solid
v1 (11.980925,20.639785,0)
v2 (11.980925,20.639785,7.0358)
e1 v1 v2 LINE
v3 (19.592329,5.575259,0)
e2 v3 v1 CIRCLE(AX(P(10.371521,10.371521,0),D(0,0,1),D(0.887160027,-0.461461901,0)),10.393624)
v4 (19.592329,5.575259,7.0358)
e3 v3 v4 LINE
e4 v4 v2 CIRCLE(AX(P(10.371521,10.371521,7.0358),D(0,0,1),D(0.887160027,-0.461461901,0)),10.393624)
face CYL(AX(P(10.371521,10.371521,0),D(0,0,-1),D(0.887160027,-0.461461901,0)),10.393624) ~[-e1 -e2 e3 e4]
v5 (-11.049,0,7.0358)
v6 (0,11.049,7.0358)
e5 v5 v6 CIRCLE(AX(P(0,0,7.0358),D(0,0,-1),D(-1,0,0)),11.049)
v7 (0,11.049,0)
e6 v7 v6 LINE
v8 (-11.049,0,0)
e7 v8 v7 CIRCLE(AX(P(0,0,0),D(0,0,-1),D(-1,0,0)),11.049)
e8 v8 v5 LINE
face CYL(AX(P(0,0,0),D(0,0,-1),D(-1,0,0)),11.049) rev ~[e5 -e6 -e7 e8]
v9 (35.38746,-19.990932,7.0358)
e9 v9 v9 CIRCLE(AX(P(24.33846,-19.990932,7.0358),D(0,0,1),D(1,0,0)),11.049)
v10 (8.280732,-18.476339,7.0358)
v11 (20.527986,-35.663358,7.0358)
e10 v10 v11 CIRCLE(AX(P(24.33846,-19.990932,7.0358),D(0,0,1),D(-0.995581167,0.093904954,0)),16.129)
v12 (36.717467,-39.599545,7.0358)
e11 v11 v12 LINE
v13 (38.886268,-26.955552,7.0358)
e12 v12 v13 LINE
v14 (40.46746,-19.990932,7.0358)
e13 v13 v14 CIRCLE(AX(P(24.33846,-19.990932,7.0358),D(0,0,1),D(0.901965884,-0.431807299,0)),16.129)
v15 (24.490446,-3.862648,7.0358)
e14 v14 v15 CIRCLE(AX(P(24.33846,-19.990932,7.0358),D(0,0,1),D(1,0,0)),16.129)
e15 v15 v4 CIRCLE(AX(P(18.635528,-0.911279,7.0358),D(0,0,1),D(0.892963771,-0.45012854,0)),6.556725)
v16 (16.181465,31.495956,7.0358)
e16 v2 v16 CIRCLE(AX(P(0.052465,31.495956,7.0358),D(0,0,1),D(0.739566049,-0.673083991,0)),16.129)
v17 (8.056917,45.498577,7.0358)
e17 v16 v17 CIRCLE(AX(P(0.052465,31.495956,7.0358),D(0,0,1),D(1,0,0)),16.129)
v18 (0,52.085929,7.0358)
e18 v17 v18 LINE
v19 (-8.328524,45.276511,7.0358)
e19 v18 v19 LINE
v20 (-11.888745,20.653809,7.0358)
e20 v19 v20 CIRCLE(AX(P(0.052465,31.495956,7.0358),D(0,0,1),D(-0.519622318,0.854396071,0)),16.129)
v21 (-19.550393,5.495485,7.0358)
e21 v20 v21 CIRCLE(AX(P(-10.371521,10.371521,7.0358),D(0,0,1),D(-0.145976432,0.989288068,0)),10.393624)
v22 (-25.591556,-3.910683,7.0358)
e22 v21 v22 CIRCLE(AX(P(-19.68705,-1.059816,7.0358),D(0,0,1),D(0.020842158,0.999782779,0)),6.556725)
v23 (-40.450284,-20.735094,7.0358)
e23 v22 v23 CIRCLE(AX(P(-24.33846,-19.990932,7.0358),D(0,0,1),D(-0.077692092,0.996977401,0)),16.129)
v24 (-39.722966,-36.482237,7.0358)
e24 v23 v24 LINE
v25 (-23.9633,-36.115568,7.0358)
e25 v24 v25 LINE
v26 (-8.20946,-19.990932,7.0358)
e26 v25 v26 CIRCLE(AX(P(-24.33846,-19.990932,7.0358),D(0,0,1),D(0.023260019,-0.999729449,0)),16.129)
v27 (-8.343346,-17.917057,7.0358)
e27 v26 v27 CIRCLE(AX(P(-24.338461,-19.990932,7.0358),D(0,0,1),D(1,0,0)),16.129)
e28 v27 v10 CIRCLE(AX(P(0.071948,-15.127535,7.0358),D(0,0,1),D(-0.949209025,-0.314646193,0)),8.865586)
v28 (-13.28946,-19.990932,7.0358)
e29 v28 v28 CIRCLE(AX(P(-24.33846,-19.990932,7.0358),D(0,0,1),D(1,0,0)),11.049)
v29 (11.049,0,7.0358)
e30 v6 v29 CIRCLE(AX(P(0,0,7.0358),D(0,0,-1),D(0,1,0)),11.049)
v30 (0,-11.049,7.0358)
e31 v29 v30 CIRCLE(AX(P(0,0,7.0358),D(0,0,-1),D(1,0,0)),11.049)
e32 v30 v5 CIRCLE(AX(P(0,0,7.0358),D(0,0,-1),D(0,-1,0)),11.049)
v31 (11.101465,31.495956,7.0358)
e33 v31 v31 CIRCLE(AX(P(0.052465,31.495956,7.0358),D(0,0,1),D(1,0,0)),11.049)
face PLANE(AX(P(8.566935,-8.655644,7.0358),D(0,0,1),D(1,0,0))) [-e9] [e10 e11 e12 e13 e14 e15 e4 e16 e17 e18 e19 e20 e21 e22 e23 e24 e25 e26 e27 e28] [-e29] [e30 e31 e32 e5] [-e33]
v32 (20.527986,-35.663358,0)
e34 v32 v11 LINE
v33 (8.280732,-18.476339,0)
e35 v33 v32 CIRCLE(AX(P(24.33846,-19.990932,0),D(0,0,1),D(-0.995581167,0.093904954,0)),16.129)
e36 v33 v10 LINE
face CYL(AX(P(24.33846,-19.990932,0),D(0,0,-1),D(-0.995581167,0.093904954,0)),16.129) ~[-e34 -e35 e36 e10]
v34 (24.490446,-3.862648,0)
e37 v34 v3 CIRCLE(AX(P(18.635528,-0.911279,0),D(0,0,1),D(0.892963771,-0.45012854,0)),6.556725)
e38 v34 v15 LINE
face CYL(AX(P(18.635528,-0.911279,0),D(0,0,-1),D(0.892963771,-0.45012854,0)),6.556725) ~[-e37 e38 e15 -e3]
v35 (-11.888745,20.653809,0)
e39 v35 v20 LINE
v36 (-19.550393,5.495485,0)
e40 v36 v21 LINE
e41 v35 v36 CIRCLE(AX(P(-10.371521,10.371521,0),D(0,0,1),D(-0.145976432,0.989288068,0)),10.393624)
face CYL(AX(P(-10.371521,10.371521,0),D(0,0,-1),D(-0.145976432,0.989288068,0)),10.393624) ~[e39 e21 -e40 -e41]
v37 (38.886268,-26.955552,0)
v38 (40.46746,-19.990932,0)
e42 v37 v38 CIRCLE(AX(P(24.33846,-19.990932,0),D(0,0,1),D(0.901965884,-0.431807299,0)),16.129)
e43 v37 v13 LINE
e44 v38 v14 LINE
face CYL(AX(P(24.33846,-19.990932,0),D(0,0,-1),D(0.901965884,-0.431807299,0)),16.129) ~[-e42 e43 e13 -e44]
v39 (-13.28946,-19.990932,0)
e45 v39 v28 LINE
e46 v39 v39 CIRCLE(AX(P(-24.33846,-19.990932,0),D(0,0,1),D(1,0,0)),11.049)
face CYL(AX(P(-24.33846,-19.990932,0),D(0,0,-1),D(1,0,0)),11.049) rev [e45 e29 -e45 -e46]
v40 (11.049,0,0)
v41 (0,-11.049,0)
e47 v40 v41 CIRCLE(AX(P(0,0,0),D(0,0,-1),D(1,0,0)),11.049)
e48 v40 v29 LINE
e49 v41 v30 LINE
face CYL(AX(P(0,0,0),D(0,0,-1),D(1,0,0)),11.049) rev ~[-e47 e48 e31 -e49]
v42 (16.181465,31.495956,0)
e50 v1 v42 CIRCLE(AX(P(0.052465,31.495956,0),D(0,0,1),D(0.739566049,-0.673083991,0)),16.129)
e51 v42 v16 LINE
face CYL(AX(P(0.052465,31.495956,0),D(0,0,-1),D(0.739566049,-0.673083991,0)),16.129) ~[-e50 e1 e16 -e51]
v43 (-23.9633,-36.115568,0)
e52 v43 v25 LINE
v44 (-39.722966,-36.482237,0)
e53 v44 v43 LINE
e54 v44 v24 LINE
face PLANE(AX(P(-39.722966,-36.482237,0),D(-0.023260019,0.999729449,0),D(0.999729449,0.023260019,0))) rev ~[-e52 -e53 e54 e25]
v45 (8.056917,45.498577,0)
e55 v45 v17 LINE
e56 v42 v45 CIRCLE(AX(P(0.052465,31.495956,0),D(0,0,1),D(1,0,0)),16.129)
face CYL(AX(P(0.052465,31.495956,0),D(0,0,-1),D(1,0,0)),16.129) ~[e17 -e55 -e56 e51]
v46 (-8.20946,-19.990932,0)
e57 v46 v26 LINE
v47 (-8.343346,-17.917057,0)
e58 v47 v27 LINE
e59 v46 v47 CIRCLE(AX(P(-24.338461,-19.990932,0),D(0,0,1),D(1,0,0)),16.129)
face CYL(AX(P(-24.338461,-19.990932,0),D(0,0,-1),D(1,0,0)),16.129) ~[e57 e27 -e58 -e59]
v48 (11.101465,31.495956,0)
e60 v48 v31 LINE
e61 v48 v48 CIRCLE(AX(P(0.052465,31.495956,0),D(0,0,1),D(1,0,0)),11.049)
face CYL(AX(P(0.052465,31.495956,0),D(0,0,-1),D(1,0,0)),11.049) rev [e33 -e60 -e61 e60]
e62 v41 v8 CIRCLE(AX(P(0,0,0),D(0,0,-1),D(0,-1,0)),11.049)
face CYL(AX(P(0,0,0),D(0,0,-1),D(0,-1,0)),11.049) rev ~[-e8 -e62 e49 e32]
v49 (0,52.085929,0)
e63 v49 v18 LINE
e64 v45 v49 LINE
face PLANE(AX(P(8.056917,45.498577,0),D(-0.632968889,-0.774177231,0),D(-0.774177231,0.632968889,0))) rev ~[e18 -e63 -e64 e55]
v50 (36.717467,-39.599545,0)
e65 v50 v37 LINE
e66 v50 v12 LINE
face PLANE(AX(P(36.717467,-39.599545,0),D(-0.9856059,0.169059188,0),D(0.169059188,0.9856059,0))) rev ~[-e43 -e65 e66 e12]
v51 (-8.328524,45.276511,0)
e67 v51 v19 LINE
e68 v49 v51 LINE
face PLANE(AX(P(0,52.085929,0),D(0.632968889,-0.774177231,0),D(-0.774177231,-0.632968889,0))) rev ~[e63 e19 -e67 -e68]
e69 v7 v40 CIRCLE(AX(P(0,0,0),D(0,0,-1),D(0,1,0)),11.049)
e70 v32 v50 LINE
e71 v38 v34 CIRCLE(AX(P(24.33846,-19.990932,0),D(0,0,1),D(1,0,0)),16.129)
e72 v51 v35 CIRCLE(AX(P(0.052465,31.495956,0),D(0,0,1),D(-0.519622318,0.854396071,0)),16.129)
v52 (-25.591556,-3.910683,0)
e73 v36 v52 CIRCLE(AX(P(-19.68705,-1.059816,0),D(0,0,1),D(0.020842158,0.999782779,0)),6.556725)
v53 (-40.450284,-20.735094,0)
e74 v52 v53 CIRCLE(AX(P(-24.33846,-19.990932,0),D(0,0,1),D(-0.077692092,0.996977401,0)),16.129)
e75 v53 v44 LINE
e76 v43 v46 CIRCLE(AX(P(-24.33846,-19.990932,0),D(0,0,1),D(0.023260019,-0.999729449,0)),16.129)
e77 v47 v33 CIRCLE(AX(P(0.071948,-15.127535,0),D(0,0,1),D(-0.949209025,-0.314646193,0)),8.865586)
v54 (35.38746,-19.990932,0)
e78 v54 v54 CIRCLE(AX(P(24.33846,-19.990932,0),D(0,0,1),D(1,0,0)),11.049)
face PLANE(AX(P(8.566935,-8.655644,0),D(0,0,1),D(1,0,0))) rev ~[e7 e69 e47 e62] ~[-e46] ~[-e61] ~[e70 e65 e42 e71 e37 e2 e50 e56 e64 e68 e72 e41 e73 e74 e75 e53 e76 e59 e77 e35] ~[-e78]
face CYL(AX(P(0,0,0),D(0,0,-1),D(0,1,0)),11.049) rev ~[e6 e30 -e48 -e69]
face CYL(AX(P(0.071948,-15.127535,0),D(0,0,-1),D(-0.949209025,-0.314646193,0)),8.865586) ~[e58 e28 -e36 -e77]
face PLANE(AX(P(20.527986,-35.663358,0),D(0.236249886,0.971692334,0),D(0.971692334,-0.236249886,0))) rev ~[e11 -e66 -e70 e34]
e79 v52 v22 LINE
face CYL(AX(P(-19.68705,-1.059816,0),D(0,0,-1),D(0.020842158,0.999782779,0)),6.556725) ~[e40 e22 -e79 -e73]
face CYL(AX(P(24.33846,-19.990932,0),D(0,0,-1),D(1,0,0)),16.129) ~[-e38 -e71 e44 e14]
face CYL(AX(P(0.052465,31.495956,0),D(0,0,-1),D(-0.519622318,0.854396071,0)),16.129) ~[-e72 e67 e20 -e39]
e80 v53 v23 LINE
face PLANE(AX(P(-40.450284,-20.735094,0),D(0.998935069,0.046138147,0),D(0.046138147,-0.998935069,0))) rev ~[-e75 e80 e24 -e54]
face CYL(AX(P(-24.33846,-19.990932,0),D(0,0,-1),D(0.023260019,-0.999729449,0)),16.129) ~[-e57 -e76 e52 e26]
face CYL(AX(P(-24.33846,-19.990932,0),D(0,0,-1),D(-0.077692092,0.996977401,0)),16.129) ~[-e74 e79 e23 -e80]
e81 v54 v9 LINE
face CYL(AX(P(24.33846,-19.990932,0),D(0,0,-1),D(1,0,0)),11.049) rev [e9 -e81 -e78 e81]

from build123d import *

# Parameters (mm, degrees)
F0_R     = 11.049
F1_DEPTH = 7.0358


with BuildPart() as f1:
    # F0 (on Top) → F1 (new body)
    with BuildSketch(Plane.XY):
        with BuildLine():
            ThreePointArc((15.3606223584, -6.5915638429), (14.0515764921, -2.7419023957), (11.049, 0))
            ThreePointArc((11.049, 0), (7.8128228253, -7.8128228253), (0, -11.049))
            ThreePointArc((0, -11.049), (3.7722273632, -14.6239373815), (8.9372329685, -15.2006467181))
            ThreePointArc((8.9372329685, -15.2006467181), (11.4112106852, -10.3456815617), (15.3606223584, -6.5915638429))
        make_face()
        with BuildLine():
            ThreePointArc((0, 11.049), (7.8128228253, 7.8128228253), (11.049, 0))
            ThreePointArc((11.049, 0), (16.0517409884, 1.6673539034), (19.5923287649, 5.5752593056))
            ThreePointArc((19.5923287649, 5.5752593056), (19.648285181, 15.0586380241), (11.9809254143, 20.639784613))
            ThreePointArc((11.9809254143, 20.639784613), (7.1318081537, 17.0036295078), (1.2830021666, 15.4139658073))
            ThreePointArc((1.2830021666, 15.4139658073), (0.3997348377, 13.3025456864), (0, 11.049))
        make_face()
        with BuildLine():
            ThreePointArc((19.5923287649, 5.5752593056), (16.0517409884, 1.6673539034), (11.049, 0))
            ThreePointArc((11.049, 0), (14.0515764921, -2.7419023957), (15.3606223584, -6.5915638429))
            ThreePointArc((15.3606223584, -6.5915638429), (19.7194060635, -4.5374863882), (24.4904460645, -3.8626479736))
            ThreePointArc((24.4904460645, -3.8626479736), (24.4551845175, 2.1090263166), (19.5923287649, 5.5752593056))
        make_face()
        with BuildLine():
            ThreePointArc((-1.2878785477, 15.4227450117), (-0.401152017, 13.3073628417), (0, 11.049))
            ThreePointArc((0, 11.049), (0.3997348377, 13.3025456864), (1.2830021666, 15.4139658073))
            ThreePointArc((1.2830021666, 15.4139658073), (-0.0026133903, 15.367050345), (-1.2878785477, 15.4227450117))
        make_face()
        with BuildLine():
            ThreePointArc((-11.049, 0), (-7.8128228253, 7.8128228253), (0, 11.049))
            ThreePointArc((0, 11.049), (-0.401152017, 13.3073628417), (-1.2878785477, 15.4227450117))
            ThreePointArc((-1.2878785477, 15.4227450117), (-7.0848261597, 17.032079869), (-11.8887450472, 20.6538092378))
            ThreePointArc((-11.8887450472, 20.6538092378), (-19.6475824124, 15.060028688), (-19.5503933089, 5.4954851872))
            ThreePointArc((-19.5503933089, 5.4954851872), (-16.0139499505, 1.6428086369), (-11.049, 0))
        make_face()
        with BuildLine():
            ThreePointArc((-8.7698737274, -15.7762258045), (-3.5991350923, -14.870419784), (0, -11.049))
            ThreePointArc((0, -11.049), (-7.8128228253, -7.8128228253), (-11.049, 0))
            ThreePointArc((-11.049, 0), (-14.2101099006, -2.5648530064), (-15.7760277941, -6.3223771779))
            ThreePointArc((-15.7760277941, -6.3223771779), (-11.380052467, -10.3875833636), (-8.7698737274, -15.7762258045))
        make_face()
        with BuildLine():
            ThreePointArc((8.9372329685, -15.2006467181), (3.7722273632, -14.6239373815), (0, -11.049))
            ThreePointArc((0, -11.049), (-3.5991350923, -14.870419784), (-8.7698737274, -15.7762258045))
            ThreePointArc((-8.7698737274, -15.7762258045), (-8.5203506621, -16.839417556), (-8.3433460468, -17.9170574897))
            ThreePointArc((-8.3433460468, -17.9170574897), (-0.2261466235, -23.9881077254), (8.2807318523, -18.4763388586))
            ThreePointArc((8.2807318523, -18.4763388586), (8.523941199, -16.8214491689), (8.9372329685, -15.2006467181))
        make_face()
        with BuildLine():
            ThreePointArc((8.9372329685, -15.2006467181), (13.7625460617, -12.1000545802), (15.3606223584, -6.5915638429))
            ThreePointArc((15.3606223584, -6.5915638429), (11.4112106852, -10.3456815617), (8.9372329685, -15.2006467181))
        make_face()
        with BuildLine():
            ThreePointArc((24.4904460645, -3.8626479736), (20.5132557556, -7.1933790888), (15.3606223584, -6.5915638429))
            ThreePointArc((15.3606223584, -6.5915638429), (13.7625460617, -12.1000545802), (8.9372329685, -15.2006467181))
            ThreePointArc((8.9372329685, -15.2006467181), (8.7646746362, -16.8696960014), (8.2807318523, -18.4763388586))
            ThreePointArc((8.2807318523, -18.4763388586), (11.2032111335, -29.3509460419), (20.5279860839, -35.6633575195))
            ThreePointArc((20.5279860839, -35.6633575195), (31.2506997753, -34.5637006191), (38.8862682367, -26.9555517986))
            ThreePointArc((38.8862682367, -26.9555517986), (40.0671958518, -23.5618596089), (40.4674604904, -19.9909318682))
            ThreePointArc((40.4674604904, -19.9909318682), (35.7969947842, -8.6398687974), (24.4904460645, -3.8626479736))
        make_face()
        with Locations((24.3384604904, -19.9909318682)):
            Circle(F0_R, mode=Mode.SUBTRACT)
        with BuildLine():
            ThreePointArc((24.4904460645, -3.8626479736), (19.7194060635, -4.5374863882), (15.3606223584, -6.5915638429))
            ThreePointArc((15.3606223584, -6.5915638429), (20.5132557556, -7.1933790888), (24.4904460645, -3.8626479736))
        make_face()
        with BuildLine():
            ThreePointArc((-15.7760277941, -6.3223771779), (-14.2101099006, -2.5648530064), (-11.049, 0))
            ThreePointArc((-11.049, 0), (-16.0139499505, 1.6428086369), (-19.5503933089, 5.4954851872))
            ThreePointArc((-19.5503933089, 5.4954851872), (-25.2039351491, 2.4834340402), (-25.5915562379, -3.9106833611))
            ThreePointArc((-25.5915562379, -3.9106833611), (-20.4899973654, -4.3277912963), (-15.7760277941, -6.3223771779))
        make_face()
        with BuildLine():
            ThreePointArc((2.1504403371, 16.730865023), (1.6917102547, 16.0888900954), (1.2830021666, 15.4139658073))
            ThreePointArc((1.2830021666, 15.4139658073), (7.1318081537, 17.0036295078), (11.9809254143, 20.639784613))
            ThreePointArc((11.9809254143, 20.639784613), (6.5311461577, 20.0296234429), (2.1504403371, 16.730865023))
        make_face()
        with BuildLine():
            ThreePointArc((-1.2878785477, 15.4227450117), (-0.0026133903, 15.367050345), (1.2830021666, 15.4139658073))
            ThreePointArc((1.2830021666, 15.4139658073), (1.6917102547, 16.0888900954), (2.1504403371, 16.730865023))
            ThreePointArc((2.1504403371, 16.730865023), (-0.0310099814, 18.9779969426), (-2.0205494764, 16.5593072242))
            ThreePointArc((-2.0205494764, 16.5593072242), (-1.6357105315, 16.0029541604), (-1.2878785477, 15.4227450117))
        make_face()
        with BuildLine():
            ThreePointArc((-11.8887450472, 20.6538092378), (-7.0848261597, 17.032079869), (-1.2878785477, 15.4227450117))
            ThreePointArc((-1.2878785477, 15.4227450117), (-1.6357105315, 16.0029541604), (-2.0205494764, 16.5593072242))
            ThreePointArc((-2.0205494764, 16.5593072242), (-6.3882732082, 19.9715813543), (-11.8887450472, 20.6538092378))
        make_face()
        with BuildLine():
            ThreePointArc((8.2807318523, -18.4763388586), (8.7646746362, -16.8696960014), (8.9372329685, -15.2006467181))
            ThreePointArc((8.9372329685, -15.2006467181), (8.523941199, -16.8214491689), (8.2807318523, -18.4763388586))
        make_face()
        with BuildLine():
            ThreePointArc((-15.7760277941, -6.3223771779), (-14.2311309419, -12.5004895292), (-8.7698737274, -15.7762258045))
            ThreePointArc((-8.7698737274, -15.7762258045), (-11.380052467, -10.3875833636), (-15.7760277941, -6.3223771779))
        make_face()
        with BuildLine():
            ThreePointArc((-8.3433460468, -17.9170574897), (-8.6227516064, -16.8598193641), (-8.7698737274, -15.7762258045))
            ThreePointArc((-8.7698737274, -15.7762258045), (-14.2311309419, -12.5004895292), (-15.7760277941, -6.3223771779))
            ThreePointArc((-15.7760277941, -6.3223771779), (-21.2515182716, -7.4271607367), (-25.5915562379, -3.9106833611))
            ThreePointArc((-25.5915562379, -3.9106833611), (-36.4277245579, -9.3141188931), (-40.450284213, -20.7350940367))
            ThreePointArc((-40.450284213, -20.7350940367), (-35.3407505097, -31.7847546298), (-23.963299648, -36.1155681538))
            ThreePointArc((-23.963299648, -36.1155681538), (-12.8016582856, -31.2624373527), (-8.2094604904, -19.9909318682))
            ThreePointArc((-8.2094604904, -19.9909318682), (-8.2429666822, -18.9518360737), (-8.3433460468, -17.9170574897))
        make_face()
        with Locations((-24.3384604904, -19.9909318682)):
            Circle(F0_R, mode=Mode.SUBTRACT)
        with BuildLine():
            ThreePointArc((-8.3433460468, -17.9170574897), (-8.5203506621, -16.839417556), (-8.7698737274, -15.7762258045))
            ThreePointArc((-8.7698737274, -15.7762258045), (-8.6227516064, -16.8598193641), (-8.3433460468, -17.9170574897))
        make_face()
        with BuildLine():
            ThreePointArc((2.1504403371, 16.730865023), (6.5311461577, 20.0296234429), (11.9809254143, 20.639784613))
            ThreePointArc((11.9809254143, 20.639784613), (15.0947181843, 25.6757116075), (16.1814646071, 31.4959563034))
            ThreePointArc((16.1814646071, 31.4959563034), (14.0032432118, 39.5904246198), (8.0569166098, 45.4985770987))
            ThreePointArc((8.0569166098, 45.4985770987), (-0.1661064271, 47.6234752602), (-8.3285237566, 45.2765105392))
            ThreePointArc((-8.3285237566, 45.2765105392), (-15.9105328531, 33.804062255), (-11.8887450472, 20.6538092378))
            ThreePointArc((-11.8887450472, 20.6538092378), (-6.3882732082, 19.9715813543), (-2.0205494764, 16.5593072242))
            ThreePointArc((-2.0205494764, 16.5593072242), (-0.0310099814, 18.9779969426), (2.1504403371, 16.730865023))
        make_face()
        with Locations((0.0524646071, 31.4959563034)):
            Circle(F0_R, mode=Mode.SUBTRACT)
        with BuildLine():
            ThreePointArc((-25.5915562379, -3.9106833611), (-21.2515182716, -7.4271607367), (-15.7760277941, -6.3223771779))
            ThreePointArc((-15.7760277941, -6.3223771779), (-20.4899973654, -4.3277912963), (-25.5915562379, -3.9106833611))
        make_face()
        with BuildLine():
            Line((0, 52.0859286189), (-8.3285237566, 45.2765105392))
            ThreePointArc((-8.3285237566, 45.2765105392), (-0.1661064271, 47.6234752602), (8.0569166098, 45.4985770987))
            Line((8.0569166098, 45.4985770987), (0, 52.0859286189))
        make_face()
        with BuildLine():
            ThreePointArc((38.8862682367, -26.9555517986), (31.2506997753, -34.5637006191), (20.5279860839, -35.6633575195))
            Line((20.5279860839, -35.6633575195), (36.7174671022, -39.5995448364))
            Line((36.7174671022, -39.5995448364), (38.8862682367, -26.9555517986))
        make_face()
        with BuildLine():
            ThreePointArc((-23.963299648, -36.1155681538), (-35.3407505097, -31.7847546298), (-40.450284213, -20.7350940367))
            Line((-40.450284213, -20.7350940367), (-39.7229656538, -36.4822374832))
            Line((-39.7229656538, -36.4822374832), (-23.963299648, -36.1155681538))
        make_face()
    extrude(amount=F1_DEPTH)


solid = f1.part
